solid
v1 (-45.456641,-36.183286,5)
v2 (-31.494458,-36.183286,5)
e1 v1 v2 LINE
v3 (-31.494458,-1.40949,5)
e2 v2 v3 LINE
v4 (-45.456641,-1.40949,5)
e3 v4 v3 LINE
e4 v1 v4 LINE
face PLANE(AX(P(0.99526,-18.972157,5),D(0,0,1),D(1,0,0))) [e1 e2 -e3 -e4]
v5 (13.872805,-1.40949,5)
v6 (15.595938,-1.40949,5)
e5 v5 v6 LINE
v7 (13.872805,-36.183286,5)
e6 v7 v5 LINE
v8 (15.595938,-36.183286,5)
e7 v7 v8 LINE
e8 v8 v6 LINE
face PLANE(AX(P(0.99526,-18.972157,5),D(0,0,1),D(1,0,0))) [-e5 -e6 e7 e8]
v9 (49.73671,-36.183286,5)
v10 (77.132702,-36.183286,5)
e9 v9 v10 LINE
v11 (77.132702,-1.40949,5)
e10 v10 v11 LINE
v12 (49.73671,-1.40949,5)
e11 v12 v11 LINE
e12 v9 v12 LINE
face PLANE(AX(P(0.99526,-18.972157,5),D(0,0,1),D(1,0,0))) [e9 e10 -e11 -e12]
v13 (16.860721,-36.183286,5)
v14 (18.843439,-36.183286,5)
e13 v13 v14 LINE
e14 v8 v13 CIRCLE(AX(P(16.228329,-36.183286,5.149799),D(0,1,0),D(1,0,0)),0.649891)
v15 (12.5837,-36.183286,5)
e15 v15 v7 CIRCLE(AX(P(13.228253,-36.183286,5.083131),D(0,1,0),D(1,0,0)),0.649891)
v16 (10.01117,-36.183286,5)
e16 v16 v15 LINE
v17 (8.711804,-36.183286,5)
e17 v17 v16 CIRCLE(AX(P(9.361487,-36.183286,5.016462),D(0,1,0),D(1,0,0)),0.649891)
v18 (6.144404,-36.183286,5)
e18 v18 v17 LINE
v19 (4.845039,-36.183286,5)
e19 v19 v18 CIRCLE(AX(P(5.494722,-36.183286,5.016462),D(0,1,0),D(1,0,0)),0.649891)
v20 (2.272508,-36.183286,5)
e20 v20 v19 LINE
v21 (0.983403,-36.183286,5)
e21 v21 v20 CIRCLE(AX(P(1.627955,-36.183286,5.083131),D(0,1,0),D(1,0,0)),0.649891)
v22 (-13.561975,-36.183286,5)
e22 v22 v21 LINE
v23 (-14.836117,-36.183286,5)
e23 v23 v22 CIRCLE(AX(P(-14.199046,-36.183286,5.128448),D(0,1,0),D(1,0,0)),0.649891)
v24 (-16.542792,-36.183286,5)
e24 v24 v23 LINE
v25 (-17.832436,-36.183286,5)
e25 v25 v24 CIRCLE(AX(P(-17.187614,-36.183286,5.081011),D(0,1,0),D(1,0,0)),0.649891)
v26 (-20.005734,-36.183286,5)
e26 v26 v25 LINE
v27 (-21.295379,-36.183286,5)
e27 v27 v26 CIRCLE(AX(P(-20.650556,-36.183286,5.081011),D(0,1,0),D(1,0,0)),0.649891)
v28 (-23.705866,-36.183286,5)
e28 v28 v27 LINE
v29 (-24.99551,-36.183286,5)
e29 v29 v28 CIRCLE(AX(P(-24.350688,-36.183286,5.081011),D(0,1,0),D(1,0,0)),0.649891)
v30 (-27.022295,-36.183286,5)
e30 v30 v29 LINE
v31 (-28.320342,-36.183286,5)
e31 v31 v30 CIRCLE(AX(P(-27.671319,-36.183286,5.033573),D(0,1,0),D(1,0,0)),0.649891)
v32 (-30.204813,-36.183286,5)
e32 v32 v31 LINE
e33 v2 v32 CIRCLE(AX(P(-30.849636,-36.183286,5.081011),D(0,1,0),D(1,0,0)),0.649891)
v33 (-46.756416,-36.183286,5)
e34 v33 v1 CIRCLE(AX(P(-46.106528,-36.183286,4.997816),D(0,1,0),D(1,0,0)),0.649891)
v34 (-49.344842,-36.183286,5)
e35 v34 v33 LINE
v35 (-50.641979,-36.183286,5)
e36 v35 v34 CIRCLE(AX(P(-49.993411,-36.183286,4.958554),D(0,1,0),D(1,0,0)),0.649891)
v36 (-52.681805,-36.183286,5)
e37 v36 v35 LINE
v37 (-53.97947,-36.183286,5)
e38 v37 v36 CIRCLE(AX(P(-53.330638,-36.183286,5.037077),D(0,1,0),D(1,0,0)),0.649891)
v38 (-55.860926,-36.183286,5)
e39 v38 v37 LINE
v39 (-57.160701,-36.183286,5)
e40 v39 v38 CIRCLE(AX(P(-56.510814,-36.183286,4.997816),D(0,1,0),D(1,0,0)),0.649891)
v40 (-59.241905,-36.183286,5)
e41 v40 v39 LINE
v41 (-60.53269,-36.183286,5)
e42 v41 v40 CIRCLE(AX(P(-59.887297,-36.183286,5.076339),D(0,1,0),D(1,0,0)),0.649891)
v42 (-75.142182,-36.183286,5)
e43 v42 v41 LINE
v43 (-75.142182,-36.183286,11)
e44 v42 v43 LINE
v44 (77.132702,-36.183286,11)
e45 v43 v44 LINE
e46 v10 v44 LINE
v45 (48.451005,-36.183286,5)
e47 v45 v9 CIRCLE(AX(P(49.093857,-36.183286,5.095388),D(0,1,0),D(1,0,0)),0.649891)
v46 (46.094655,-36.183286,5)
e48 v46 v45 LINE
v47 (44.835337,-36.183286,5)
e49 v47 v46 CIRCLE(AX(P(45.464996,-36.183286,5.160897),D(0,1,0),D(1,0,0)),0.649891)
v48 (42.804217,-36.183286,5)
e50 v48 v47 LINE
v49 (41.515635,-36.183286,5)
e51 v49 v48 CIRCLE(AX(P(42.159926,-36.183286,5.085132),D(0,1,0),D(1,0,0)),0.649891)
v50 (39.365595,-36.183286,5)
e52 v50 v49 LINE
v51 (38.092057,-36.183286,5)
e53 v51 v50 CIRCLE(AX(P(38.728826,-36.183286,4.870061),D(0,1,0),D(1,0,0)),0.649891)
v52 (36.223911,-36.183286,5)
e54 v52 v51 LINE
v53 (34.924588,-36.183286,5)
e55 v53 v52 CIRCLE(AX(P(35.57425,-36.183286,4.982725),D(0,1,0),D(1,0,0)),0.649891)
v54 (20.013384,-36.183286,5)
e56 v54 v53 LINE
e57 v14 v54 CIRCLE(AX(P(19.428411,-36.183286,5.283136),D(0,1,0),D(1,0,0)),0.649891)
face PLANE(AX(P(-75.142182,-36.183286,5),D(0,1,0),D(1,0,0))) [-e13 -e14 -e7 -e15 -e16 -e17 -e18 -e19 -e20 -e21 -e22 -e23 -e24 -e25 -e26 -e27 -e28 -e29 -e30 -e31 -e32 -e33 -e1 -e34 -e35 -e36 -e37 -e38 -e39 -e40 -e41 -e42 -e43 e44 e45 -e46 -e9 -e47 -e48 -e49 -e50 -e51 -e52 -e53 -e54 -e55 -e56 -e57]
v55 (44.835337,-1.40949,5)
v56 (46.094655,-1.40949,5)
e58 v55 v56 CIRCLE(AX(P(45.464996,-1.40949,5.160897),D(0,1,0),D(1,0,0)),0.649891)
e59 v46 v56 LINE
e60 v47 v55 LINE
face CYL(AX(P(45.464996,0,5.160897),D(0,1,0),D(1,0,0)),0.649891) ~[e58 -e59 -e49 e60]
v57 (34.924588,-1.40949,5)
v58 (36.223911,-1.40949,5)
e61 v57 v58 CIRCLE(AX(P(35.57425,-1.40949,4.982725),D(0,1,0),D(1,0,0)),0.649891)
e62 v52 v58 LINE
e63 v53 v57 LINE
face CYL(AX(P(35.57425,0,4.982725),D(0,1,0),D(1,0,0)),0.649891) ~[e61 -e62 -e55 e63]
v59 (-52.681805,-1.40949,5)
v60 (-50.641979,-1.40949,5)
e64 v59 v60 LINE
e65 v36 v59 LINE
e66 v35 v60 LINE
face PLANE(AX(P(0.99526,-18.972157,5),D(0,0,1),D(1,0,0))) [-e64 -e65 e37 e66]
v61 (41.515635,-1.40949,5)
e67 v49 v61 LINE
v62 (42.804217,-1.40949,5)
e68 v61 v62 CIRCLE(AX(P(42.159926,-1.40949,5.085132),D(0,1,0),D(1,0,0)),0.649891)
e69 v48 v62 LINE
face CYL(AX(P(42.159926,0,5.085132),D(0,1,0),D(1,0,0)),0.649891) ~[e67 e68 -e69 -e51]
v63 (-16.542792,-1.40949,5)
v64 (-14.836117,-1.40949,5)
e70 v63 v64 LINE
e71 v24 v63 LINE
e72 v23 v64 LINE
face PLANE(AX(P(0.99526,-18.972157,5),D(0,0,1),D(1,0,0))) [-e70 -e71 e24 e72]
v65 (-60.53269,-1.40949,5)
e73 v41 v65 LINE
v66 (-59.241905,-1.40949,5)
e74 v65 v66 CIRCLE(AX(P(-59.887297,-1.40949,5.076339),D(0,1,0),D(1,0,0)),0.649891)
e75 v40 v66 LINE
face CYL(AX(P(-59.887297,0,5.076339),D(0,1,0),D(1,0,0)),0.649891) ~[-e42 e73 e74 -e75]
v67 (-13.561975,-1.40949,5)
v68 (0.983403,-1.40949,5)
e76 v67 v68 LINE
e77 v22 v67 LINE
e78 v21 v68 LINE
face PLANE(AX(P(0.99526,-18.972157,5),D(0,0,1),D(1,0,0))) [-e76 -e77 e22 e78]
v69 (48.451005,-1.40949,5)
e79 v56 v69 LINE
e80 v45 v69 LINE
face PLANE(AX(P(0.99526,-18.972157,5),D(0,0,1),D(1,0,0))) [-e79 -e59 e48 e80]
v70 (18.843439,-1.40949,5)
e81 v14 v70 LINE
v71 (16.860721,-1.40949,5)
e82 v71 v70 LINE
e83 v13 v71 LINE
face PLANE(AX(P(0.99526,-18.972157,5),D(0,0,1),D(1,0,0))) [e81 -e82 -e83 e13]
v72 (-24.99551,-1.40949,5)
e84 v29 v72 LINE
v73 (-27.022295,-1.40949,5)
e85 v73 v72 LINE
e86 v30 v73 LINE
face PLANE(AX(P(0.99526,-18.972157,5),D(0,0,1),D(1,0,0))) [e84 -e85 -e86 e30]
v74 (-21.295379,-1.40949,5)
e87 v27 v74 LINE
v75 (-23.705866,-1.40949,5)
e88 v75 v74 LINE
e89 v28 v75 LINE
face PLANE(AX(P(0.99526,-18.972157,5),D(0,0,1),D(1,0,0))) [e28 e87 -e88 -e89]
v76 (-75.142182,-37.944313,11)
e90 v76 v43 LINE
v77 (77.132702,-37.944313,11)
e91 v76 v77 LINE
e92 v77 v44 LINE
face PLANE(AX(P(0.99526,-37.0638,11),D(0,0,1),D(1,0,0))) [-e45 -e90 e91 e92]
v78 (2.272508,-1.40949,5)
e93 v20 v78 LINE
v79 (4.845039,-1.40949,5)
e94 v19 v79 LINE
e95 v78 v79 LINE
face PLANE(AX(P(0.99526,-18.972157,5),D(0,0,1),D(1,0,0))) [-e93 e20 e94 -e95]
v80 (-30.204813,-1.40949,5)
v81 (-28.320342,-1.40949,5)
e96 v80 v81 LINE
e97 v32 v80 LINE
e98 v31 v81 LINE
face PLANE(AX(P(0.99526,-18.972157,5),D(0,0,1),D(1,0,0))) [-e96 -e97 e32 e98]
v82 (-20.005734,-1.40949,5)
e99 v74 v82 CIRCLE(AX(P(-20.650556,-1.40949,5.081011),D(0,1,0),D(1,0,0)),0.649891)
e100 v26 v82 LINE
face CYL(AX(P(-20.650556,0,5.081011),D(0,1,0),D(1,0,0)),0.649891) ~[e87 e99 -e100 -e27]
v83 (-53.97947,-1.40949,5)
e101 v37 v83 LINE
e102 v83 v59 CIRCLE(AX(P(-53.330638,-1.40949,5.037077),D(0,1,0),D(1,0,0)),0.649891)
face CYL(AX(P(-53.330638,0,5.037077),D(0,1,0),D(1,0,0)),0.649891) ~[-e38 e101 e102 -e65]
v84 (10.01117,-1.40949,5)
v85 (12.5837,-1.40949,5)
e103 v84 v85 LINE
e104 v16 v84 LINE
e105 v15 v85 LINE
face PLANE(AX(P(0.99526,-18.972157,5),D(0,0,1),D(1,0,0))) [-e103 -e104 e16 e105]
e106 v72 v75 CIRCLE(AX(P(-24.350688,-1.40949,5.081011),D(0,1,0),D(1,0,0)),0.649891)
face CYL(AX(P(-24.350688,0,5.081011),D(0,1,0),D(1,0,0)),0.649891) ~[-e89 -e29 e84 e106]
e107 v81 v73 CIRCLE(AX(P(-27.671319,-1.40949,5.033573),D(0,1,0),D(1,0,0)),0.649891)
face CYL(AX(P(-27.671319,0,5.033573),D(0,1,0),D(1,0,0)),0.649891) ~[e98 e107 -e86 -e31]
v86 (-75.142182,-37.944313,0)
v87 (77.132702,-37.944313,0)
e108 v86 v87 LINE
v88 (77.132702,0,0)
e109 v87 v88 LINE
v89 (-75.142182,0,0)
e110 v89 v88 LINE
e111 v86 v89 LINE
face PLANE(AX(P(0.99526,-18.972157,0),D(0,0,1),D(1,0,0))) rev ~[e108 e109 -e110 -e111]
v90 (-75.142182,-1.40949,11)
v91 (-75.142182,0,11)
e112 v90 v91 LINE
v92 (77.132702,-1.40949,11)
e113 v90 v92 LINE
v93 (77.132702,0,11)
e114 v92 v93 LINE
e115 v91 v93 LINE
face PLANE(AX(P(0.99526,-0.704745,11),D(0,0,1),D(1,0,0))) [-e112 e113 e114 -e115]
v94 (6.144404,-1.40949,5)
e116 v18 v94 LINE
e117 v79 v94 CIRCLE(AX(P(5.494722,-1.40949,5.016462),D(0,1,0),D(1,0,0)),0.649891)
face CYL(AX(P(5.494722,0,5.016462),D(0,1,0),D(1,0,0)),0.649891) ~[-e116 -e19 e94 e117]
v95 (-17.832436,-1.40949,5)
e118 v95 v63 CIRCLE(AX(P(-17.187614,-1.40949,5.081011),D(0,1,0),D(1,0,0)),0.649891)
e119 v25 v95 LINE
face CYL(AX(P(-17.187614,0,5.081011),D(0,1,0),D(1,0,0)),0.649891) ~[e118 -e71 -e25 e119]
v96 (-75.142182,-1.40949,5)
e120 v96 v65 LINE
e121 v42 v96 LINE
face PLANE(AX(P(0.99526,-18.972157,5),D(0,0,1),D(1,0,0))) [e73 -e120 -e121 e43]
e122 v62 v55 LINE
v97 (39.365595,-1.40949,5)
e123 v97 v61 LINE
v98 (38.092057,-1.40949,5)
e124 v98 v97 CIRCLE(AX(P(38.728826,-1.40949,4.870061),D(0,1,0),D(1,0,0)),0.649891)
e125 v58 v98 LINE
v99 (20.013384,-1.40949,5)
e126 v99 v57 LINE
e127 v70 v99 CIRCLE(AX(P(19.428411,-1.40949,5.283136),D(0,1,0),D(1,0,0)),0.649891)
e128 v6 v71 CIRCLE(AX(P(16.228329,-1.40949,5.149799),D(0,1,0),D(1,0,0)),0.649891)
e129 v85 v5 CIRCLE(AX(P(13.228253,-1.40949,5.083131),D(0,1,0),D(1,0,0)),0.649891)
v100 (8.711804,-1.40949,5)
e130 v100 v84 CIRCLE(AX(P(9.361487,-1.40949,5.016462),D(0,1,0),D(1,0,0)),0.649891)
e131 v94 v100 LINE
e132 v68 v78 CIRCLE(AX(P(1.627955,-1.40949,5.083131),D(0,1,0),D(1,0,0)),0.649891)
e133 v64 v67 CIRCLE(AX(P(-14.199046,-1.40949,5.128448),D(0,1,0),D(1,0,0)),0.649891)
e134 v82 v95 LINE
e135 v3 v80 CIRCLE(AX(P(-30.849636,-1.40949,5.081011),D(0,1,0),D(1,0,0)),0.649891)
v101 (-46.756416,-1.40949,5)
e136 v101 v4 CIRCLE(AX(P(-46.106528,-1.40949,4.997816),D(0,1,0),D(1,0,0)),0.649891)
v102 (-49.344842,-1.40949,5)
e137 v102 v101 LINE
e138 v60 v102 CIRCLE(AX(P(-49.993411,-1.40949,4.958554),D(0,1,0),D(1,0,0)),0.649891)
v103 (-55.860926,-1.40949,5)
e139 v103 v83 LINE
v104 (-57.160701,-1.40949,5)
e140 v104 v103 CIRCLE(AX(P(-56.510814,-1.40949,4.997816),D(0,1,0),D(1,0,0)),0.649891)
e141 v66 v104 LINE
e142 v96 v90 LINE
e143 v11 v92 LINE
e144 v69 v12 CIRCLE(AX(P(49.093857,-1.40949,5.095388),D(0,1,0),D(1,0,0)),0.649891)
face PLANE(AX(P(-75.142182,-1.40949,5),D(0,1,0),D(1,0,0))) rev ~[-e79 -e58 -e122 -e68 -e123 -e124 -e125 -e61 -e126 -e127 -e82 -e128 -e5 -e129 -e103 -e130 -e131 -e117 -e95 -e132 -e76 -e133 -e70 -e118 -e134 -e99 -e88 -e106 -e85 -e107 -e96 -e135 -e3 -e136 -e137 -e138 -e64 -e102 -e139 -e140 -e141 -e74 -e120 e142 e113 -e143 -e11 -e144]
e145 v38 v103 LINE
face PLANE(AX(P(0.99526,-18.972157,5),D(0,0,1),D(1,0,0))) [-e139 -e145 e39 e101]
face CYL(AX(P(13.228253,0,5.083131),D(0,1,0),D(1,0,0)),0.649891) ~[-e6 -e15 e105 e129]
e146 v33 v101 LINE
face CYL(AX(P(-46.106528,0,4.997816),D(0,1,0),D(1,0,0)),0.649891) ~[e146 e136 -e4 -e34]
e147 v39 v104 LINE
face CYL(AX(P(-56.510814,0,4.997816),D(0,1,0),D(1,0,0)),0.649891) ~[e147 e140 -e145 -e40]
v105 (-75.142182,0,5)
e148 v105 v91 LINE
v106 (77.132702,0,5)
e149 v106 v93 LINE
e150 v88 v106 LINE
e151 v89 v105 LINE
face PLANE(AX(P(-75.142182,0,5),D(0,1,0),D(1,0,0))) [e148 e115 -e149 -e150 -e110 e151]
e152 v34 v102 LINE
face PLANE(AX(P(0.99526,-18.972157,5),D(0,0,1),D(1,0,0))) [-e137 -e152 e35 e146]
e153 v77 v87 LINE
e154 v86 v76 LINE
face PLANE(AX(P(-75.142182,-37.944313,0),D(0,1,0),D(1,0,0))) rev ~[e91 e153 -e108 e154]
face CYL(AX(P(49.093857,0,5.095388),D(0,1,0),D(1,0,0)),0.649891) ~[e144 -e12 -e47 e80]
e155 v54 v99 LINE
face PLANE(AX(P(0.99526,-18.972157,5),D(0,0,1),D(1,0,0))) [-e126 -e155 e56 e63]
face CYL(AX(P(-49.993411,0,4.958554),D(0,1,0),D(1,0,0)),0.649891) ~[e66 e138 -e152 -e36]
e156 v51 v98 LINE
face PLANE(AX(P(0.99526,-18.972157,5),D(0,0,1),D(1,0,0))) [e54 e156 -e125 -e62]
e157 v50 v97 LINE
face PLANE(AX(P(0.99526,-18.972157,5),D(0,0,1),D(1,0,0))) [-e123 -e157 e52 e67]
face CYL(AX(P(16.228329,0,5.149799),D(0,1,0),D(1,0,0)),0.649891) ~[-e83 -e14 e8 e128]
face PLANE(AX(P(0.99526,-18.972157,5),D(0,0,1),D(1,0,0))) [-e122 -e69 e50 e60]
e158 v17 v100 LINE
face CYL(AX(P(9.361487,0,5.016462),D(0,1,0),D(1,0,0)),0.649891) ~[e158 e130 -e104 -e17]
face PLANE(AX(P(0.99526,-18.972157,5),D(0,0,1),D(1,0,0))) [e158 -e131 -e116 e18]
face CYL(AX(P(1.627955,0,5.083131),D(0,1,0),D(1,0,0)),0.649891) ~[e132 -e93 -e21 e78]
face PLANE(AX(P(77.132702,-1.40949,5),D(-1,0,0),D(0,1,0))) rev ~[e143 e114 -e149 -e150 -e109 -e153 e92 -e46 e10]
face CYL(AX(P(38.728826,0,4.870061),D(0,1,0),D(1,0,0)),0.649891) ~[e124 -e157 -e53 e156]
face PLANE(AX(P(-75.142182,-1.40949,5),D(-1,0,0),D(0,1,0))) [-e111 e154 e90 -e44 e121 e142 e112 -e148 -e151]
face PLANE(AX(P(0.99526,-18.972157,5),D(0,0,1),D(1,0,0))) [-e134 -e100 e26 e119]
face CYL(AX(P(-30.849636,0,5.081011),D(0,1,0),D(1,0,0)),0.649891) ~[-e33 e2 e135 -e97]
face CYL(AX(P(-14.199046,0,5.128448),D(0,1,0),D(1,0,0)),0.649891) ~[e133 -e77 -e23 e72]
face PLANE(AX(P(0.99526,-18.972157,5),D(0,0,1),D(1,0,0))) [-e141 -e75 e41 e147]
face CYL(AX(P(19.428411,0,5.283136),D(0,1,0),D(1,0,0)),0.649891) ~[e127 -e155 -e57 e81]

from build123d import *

# Parameters (mm, degrees)
F0_W     = 152.2748842835
F0_H     = 37.9443131387
F1_DEPTH = 5
F5_R     = 0.6498911682
F6_DEPTH = 37.9
F2_W     = 152.2748842835
F2_H     = 1.4094897779
F2_H_2   = 1.7610266805
F7_DEPTH = 6


# Not quite as in the source:
# - the program builds the solid bodies; features that only make, move or delete a surface that nothing else refers to are left out


with BuildPart() as f1:
    # F0 (on Top) → F1 (new body)
    with BuildSketch(Plane.XY):
        with Locations((0.995259732, -18.9721565694)):
            Rectangle(F0_W, F0_H)
    extrude(amount=F1_DEPTH)

    # F5 (on Front) → F6 (join)
    with BuildSketch(Plane.XZ):
        with Locations((-59.8872974515, 5.076338537)):
            Circle(F5_R)
        with Locations((-56.5108135343, 4.9978159368)):
            Circle(F5_R)
        with Locations((-46.1065284908, 4.9978159368)):
            Circle(F5_R)
        with Locations((-49.9934107065, 4.958554171)):
            Circle(F5_R)
        with Locations((-53.3306375146, 5.0370772369)):
            Circle(F5_R)
        with Locations((-30.849635601, 5.0810105167)):
            Circle(F5_R)
        with Locations((-14.1990464181, 5.1284483634)):
            Circle(F5_R)
        with Locations((-17.1876139939, 5.0810105167)):
            Circle(F5_R)
        with Locations((-20.650556311, 5.0810105167)):
            Circle(F5_R)
        with Locations((-24.3506878614, 5.0810105167)):
            Circle(F5_R)
        with Locations((-27.6713185012, 5.0335731357)):
            Circle(F5_R)
        with Locations((1.6279553529, 5.0831306726)):
            Circle(F5_R)
        with Locations((19.4284114987, 5.2831359208)):
            Circle(F5_R)
        with Locations((16.2283293903, 5.1497989334)):
            Circle(F5_R)
        with Locations((13.2282525301, 5.0831306726)):
            Circle(F5_R)
        with Locations((9.361486882, 5.0164619461)):
            Circle(F5_R)
        with Locations((5.4947216995, 5.0164619461)):
            Circle(F5_R)
        with Locations((49.0938574076, 5.0953882746)):
            Circle(F5_R)
        with Locations((45.4649962485, 5.1608970389)):
            Circle(F5_R)
        with Locations((42.1599261463, 5.0851320848)):
            Circle(F5_R)
        with Locations((38.728825748, 4.870061297)):
            Circle(F5_R)
        with Locations((35.5742499232, 4.9827247858)):
            Circle(F5_R)
    extrude(amount=F6_DEPTH)

    # F2 (on face) → F7 (join)
    with BuildSketch(Plane.XY.offset(5)):
        with Locations((0.995259732, -0.7047448889)):
            Rectangle(F2_W, F2_H)
        with Locations((0.995259732, -37.0637997985)):
            Rectangle(F2_W, F2_H_2)
    extrude(amount=F7_DEPTH)


solid = f1.part
